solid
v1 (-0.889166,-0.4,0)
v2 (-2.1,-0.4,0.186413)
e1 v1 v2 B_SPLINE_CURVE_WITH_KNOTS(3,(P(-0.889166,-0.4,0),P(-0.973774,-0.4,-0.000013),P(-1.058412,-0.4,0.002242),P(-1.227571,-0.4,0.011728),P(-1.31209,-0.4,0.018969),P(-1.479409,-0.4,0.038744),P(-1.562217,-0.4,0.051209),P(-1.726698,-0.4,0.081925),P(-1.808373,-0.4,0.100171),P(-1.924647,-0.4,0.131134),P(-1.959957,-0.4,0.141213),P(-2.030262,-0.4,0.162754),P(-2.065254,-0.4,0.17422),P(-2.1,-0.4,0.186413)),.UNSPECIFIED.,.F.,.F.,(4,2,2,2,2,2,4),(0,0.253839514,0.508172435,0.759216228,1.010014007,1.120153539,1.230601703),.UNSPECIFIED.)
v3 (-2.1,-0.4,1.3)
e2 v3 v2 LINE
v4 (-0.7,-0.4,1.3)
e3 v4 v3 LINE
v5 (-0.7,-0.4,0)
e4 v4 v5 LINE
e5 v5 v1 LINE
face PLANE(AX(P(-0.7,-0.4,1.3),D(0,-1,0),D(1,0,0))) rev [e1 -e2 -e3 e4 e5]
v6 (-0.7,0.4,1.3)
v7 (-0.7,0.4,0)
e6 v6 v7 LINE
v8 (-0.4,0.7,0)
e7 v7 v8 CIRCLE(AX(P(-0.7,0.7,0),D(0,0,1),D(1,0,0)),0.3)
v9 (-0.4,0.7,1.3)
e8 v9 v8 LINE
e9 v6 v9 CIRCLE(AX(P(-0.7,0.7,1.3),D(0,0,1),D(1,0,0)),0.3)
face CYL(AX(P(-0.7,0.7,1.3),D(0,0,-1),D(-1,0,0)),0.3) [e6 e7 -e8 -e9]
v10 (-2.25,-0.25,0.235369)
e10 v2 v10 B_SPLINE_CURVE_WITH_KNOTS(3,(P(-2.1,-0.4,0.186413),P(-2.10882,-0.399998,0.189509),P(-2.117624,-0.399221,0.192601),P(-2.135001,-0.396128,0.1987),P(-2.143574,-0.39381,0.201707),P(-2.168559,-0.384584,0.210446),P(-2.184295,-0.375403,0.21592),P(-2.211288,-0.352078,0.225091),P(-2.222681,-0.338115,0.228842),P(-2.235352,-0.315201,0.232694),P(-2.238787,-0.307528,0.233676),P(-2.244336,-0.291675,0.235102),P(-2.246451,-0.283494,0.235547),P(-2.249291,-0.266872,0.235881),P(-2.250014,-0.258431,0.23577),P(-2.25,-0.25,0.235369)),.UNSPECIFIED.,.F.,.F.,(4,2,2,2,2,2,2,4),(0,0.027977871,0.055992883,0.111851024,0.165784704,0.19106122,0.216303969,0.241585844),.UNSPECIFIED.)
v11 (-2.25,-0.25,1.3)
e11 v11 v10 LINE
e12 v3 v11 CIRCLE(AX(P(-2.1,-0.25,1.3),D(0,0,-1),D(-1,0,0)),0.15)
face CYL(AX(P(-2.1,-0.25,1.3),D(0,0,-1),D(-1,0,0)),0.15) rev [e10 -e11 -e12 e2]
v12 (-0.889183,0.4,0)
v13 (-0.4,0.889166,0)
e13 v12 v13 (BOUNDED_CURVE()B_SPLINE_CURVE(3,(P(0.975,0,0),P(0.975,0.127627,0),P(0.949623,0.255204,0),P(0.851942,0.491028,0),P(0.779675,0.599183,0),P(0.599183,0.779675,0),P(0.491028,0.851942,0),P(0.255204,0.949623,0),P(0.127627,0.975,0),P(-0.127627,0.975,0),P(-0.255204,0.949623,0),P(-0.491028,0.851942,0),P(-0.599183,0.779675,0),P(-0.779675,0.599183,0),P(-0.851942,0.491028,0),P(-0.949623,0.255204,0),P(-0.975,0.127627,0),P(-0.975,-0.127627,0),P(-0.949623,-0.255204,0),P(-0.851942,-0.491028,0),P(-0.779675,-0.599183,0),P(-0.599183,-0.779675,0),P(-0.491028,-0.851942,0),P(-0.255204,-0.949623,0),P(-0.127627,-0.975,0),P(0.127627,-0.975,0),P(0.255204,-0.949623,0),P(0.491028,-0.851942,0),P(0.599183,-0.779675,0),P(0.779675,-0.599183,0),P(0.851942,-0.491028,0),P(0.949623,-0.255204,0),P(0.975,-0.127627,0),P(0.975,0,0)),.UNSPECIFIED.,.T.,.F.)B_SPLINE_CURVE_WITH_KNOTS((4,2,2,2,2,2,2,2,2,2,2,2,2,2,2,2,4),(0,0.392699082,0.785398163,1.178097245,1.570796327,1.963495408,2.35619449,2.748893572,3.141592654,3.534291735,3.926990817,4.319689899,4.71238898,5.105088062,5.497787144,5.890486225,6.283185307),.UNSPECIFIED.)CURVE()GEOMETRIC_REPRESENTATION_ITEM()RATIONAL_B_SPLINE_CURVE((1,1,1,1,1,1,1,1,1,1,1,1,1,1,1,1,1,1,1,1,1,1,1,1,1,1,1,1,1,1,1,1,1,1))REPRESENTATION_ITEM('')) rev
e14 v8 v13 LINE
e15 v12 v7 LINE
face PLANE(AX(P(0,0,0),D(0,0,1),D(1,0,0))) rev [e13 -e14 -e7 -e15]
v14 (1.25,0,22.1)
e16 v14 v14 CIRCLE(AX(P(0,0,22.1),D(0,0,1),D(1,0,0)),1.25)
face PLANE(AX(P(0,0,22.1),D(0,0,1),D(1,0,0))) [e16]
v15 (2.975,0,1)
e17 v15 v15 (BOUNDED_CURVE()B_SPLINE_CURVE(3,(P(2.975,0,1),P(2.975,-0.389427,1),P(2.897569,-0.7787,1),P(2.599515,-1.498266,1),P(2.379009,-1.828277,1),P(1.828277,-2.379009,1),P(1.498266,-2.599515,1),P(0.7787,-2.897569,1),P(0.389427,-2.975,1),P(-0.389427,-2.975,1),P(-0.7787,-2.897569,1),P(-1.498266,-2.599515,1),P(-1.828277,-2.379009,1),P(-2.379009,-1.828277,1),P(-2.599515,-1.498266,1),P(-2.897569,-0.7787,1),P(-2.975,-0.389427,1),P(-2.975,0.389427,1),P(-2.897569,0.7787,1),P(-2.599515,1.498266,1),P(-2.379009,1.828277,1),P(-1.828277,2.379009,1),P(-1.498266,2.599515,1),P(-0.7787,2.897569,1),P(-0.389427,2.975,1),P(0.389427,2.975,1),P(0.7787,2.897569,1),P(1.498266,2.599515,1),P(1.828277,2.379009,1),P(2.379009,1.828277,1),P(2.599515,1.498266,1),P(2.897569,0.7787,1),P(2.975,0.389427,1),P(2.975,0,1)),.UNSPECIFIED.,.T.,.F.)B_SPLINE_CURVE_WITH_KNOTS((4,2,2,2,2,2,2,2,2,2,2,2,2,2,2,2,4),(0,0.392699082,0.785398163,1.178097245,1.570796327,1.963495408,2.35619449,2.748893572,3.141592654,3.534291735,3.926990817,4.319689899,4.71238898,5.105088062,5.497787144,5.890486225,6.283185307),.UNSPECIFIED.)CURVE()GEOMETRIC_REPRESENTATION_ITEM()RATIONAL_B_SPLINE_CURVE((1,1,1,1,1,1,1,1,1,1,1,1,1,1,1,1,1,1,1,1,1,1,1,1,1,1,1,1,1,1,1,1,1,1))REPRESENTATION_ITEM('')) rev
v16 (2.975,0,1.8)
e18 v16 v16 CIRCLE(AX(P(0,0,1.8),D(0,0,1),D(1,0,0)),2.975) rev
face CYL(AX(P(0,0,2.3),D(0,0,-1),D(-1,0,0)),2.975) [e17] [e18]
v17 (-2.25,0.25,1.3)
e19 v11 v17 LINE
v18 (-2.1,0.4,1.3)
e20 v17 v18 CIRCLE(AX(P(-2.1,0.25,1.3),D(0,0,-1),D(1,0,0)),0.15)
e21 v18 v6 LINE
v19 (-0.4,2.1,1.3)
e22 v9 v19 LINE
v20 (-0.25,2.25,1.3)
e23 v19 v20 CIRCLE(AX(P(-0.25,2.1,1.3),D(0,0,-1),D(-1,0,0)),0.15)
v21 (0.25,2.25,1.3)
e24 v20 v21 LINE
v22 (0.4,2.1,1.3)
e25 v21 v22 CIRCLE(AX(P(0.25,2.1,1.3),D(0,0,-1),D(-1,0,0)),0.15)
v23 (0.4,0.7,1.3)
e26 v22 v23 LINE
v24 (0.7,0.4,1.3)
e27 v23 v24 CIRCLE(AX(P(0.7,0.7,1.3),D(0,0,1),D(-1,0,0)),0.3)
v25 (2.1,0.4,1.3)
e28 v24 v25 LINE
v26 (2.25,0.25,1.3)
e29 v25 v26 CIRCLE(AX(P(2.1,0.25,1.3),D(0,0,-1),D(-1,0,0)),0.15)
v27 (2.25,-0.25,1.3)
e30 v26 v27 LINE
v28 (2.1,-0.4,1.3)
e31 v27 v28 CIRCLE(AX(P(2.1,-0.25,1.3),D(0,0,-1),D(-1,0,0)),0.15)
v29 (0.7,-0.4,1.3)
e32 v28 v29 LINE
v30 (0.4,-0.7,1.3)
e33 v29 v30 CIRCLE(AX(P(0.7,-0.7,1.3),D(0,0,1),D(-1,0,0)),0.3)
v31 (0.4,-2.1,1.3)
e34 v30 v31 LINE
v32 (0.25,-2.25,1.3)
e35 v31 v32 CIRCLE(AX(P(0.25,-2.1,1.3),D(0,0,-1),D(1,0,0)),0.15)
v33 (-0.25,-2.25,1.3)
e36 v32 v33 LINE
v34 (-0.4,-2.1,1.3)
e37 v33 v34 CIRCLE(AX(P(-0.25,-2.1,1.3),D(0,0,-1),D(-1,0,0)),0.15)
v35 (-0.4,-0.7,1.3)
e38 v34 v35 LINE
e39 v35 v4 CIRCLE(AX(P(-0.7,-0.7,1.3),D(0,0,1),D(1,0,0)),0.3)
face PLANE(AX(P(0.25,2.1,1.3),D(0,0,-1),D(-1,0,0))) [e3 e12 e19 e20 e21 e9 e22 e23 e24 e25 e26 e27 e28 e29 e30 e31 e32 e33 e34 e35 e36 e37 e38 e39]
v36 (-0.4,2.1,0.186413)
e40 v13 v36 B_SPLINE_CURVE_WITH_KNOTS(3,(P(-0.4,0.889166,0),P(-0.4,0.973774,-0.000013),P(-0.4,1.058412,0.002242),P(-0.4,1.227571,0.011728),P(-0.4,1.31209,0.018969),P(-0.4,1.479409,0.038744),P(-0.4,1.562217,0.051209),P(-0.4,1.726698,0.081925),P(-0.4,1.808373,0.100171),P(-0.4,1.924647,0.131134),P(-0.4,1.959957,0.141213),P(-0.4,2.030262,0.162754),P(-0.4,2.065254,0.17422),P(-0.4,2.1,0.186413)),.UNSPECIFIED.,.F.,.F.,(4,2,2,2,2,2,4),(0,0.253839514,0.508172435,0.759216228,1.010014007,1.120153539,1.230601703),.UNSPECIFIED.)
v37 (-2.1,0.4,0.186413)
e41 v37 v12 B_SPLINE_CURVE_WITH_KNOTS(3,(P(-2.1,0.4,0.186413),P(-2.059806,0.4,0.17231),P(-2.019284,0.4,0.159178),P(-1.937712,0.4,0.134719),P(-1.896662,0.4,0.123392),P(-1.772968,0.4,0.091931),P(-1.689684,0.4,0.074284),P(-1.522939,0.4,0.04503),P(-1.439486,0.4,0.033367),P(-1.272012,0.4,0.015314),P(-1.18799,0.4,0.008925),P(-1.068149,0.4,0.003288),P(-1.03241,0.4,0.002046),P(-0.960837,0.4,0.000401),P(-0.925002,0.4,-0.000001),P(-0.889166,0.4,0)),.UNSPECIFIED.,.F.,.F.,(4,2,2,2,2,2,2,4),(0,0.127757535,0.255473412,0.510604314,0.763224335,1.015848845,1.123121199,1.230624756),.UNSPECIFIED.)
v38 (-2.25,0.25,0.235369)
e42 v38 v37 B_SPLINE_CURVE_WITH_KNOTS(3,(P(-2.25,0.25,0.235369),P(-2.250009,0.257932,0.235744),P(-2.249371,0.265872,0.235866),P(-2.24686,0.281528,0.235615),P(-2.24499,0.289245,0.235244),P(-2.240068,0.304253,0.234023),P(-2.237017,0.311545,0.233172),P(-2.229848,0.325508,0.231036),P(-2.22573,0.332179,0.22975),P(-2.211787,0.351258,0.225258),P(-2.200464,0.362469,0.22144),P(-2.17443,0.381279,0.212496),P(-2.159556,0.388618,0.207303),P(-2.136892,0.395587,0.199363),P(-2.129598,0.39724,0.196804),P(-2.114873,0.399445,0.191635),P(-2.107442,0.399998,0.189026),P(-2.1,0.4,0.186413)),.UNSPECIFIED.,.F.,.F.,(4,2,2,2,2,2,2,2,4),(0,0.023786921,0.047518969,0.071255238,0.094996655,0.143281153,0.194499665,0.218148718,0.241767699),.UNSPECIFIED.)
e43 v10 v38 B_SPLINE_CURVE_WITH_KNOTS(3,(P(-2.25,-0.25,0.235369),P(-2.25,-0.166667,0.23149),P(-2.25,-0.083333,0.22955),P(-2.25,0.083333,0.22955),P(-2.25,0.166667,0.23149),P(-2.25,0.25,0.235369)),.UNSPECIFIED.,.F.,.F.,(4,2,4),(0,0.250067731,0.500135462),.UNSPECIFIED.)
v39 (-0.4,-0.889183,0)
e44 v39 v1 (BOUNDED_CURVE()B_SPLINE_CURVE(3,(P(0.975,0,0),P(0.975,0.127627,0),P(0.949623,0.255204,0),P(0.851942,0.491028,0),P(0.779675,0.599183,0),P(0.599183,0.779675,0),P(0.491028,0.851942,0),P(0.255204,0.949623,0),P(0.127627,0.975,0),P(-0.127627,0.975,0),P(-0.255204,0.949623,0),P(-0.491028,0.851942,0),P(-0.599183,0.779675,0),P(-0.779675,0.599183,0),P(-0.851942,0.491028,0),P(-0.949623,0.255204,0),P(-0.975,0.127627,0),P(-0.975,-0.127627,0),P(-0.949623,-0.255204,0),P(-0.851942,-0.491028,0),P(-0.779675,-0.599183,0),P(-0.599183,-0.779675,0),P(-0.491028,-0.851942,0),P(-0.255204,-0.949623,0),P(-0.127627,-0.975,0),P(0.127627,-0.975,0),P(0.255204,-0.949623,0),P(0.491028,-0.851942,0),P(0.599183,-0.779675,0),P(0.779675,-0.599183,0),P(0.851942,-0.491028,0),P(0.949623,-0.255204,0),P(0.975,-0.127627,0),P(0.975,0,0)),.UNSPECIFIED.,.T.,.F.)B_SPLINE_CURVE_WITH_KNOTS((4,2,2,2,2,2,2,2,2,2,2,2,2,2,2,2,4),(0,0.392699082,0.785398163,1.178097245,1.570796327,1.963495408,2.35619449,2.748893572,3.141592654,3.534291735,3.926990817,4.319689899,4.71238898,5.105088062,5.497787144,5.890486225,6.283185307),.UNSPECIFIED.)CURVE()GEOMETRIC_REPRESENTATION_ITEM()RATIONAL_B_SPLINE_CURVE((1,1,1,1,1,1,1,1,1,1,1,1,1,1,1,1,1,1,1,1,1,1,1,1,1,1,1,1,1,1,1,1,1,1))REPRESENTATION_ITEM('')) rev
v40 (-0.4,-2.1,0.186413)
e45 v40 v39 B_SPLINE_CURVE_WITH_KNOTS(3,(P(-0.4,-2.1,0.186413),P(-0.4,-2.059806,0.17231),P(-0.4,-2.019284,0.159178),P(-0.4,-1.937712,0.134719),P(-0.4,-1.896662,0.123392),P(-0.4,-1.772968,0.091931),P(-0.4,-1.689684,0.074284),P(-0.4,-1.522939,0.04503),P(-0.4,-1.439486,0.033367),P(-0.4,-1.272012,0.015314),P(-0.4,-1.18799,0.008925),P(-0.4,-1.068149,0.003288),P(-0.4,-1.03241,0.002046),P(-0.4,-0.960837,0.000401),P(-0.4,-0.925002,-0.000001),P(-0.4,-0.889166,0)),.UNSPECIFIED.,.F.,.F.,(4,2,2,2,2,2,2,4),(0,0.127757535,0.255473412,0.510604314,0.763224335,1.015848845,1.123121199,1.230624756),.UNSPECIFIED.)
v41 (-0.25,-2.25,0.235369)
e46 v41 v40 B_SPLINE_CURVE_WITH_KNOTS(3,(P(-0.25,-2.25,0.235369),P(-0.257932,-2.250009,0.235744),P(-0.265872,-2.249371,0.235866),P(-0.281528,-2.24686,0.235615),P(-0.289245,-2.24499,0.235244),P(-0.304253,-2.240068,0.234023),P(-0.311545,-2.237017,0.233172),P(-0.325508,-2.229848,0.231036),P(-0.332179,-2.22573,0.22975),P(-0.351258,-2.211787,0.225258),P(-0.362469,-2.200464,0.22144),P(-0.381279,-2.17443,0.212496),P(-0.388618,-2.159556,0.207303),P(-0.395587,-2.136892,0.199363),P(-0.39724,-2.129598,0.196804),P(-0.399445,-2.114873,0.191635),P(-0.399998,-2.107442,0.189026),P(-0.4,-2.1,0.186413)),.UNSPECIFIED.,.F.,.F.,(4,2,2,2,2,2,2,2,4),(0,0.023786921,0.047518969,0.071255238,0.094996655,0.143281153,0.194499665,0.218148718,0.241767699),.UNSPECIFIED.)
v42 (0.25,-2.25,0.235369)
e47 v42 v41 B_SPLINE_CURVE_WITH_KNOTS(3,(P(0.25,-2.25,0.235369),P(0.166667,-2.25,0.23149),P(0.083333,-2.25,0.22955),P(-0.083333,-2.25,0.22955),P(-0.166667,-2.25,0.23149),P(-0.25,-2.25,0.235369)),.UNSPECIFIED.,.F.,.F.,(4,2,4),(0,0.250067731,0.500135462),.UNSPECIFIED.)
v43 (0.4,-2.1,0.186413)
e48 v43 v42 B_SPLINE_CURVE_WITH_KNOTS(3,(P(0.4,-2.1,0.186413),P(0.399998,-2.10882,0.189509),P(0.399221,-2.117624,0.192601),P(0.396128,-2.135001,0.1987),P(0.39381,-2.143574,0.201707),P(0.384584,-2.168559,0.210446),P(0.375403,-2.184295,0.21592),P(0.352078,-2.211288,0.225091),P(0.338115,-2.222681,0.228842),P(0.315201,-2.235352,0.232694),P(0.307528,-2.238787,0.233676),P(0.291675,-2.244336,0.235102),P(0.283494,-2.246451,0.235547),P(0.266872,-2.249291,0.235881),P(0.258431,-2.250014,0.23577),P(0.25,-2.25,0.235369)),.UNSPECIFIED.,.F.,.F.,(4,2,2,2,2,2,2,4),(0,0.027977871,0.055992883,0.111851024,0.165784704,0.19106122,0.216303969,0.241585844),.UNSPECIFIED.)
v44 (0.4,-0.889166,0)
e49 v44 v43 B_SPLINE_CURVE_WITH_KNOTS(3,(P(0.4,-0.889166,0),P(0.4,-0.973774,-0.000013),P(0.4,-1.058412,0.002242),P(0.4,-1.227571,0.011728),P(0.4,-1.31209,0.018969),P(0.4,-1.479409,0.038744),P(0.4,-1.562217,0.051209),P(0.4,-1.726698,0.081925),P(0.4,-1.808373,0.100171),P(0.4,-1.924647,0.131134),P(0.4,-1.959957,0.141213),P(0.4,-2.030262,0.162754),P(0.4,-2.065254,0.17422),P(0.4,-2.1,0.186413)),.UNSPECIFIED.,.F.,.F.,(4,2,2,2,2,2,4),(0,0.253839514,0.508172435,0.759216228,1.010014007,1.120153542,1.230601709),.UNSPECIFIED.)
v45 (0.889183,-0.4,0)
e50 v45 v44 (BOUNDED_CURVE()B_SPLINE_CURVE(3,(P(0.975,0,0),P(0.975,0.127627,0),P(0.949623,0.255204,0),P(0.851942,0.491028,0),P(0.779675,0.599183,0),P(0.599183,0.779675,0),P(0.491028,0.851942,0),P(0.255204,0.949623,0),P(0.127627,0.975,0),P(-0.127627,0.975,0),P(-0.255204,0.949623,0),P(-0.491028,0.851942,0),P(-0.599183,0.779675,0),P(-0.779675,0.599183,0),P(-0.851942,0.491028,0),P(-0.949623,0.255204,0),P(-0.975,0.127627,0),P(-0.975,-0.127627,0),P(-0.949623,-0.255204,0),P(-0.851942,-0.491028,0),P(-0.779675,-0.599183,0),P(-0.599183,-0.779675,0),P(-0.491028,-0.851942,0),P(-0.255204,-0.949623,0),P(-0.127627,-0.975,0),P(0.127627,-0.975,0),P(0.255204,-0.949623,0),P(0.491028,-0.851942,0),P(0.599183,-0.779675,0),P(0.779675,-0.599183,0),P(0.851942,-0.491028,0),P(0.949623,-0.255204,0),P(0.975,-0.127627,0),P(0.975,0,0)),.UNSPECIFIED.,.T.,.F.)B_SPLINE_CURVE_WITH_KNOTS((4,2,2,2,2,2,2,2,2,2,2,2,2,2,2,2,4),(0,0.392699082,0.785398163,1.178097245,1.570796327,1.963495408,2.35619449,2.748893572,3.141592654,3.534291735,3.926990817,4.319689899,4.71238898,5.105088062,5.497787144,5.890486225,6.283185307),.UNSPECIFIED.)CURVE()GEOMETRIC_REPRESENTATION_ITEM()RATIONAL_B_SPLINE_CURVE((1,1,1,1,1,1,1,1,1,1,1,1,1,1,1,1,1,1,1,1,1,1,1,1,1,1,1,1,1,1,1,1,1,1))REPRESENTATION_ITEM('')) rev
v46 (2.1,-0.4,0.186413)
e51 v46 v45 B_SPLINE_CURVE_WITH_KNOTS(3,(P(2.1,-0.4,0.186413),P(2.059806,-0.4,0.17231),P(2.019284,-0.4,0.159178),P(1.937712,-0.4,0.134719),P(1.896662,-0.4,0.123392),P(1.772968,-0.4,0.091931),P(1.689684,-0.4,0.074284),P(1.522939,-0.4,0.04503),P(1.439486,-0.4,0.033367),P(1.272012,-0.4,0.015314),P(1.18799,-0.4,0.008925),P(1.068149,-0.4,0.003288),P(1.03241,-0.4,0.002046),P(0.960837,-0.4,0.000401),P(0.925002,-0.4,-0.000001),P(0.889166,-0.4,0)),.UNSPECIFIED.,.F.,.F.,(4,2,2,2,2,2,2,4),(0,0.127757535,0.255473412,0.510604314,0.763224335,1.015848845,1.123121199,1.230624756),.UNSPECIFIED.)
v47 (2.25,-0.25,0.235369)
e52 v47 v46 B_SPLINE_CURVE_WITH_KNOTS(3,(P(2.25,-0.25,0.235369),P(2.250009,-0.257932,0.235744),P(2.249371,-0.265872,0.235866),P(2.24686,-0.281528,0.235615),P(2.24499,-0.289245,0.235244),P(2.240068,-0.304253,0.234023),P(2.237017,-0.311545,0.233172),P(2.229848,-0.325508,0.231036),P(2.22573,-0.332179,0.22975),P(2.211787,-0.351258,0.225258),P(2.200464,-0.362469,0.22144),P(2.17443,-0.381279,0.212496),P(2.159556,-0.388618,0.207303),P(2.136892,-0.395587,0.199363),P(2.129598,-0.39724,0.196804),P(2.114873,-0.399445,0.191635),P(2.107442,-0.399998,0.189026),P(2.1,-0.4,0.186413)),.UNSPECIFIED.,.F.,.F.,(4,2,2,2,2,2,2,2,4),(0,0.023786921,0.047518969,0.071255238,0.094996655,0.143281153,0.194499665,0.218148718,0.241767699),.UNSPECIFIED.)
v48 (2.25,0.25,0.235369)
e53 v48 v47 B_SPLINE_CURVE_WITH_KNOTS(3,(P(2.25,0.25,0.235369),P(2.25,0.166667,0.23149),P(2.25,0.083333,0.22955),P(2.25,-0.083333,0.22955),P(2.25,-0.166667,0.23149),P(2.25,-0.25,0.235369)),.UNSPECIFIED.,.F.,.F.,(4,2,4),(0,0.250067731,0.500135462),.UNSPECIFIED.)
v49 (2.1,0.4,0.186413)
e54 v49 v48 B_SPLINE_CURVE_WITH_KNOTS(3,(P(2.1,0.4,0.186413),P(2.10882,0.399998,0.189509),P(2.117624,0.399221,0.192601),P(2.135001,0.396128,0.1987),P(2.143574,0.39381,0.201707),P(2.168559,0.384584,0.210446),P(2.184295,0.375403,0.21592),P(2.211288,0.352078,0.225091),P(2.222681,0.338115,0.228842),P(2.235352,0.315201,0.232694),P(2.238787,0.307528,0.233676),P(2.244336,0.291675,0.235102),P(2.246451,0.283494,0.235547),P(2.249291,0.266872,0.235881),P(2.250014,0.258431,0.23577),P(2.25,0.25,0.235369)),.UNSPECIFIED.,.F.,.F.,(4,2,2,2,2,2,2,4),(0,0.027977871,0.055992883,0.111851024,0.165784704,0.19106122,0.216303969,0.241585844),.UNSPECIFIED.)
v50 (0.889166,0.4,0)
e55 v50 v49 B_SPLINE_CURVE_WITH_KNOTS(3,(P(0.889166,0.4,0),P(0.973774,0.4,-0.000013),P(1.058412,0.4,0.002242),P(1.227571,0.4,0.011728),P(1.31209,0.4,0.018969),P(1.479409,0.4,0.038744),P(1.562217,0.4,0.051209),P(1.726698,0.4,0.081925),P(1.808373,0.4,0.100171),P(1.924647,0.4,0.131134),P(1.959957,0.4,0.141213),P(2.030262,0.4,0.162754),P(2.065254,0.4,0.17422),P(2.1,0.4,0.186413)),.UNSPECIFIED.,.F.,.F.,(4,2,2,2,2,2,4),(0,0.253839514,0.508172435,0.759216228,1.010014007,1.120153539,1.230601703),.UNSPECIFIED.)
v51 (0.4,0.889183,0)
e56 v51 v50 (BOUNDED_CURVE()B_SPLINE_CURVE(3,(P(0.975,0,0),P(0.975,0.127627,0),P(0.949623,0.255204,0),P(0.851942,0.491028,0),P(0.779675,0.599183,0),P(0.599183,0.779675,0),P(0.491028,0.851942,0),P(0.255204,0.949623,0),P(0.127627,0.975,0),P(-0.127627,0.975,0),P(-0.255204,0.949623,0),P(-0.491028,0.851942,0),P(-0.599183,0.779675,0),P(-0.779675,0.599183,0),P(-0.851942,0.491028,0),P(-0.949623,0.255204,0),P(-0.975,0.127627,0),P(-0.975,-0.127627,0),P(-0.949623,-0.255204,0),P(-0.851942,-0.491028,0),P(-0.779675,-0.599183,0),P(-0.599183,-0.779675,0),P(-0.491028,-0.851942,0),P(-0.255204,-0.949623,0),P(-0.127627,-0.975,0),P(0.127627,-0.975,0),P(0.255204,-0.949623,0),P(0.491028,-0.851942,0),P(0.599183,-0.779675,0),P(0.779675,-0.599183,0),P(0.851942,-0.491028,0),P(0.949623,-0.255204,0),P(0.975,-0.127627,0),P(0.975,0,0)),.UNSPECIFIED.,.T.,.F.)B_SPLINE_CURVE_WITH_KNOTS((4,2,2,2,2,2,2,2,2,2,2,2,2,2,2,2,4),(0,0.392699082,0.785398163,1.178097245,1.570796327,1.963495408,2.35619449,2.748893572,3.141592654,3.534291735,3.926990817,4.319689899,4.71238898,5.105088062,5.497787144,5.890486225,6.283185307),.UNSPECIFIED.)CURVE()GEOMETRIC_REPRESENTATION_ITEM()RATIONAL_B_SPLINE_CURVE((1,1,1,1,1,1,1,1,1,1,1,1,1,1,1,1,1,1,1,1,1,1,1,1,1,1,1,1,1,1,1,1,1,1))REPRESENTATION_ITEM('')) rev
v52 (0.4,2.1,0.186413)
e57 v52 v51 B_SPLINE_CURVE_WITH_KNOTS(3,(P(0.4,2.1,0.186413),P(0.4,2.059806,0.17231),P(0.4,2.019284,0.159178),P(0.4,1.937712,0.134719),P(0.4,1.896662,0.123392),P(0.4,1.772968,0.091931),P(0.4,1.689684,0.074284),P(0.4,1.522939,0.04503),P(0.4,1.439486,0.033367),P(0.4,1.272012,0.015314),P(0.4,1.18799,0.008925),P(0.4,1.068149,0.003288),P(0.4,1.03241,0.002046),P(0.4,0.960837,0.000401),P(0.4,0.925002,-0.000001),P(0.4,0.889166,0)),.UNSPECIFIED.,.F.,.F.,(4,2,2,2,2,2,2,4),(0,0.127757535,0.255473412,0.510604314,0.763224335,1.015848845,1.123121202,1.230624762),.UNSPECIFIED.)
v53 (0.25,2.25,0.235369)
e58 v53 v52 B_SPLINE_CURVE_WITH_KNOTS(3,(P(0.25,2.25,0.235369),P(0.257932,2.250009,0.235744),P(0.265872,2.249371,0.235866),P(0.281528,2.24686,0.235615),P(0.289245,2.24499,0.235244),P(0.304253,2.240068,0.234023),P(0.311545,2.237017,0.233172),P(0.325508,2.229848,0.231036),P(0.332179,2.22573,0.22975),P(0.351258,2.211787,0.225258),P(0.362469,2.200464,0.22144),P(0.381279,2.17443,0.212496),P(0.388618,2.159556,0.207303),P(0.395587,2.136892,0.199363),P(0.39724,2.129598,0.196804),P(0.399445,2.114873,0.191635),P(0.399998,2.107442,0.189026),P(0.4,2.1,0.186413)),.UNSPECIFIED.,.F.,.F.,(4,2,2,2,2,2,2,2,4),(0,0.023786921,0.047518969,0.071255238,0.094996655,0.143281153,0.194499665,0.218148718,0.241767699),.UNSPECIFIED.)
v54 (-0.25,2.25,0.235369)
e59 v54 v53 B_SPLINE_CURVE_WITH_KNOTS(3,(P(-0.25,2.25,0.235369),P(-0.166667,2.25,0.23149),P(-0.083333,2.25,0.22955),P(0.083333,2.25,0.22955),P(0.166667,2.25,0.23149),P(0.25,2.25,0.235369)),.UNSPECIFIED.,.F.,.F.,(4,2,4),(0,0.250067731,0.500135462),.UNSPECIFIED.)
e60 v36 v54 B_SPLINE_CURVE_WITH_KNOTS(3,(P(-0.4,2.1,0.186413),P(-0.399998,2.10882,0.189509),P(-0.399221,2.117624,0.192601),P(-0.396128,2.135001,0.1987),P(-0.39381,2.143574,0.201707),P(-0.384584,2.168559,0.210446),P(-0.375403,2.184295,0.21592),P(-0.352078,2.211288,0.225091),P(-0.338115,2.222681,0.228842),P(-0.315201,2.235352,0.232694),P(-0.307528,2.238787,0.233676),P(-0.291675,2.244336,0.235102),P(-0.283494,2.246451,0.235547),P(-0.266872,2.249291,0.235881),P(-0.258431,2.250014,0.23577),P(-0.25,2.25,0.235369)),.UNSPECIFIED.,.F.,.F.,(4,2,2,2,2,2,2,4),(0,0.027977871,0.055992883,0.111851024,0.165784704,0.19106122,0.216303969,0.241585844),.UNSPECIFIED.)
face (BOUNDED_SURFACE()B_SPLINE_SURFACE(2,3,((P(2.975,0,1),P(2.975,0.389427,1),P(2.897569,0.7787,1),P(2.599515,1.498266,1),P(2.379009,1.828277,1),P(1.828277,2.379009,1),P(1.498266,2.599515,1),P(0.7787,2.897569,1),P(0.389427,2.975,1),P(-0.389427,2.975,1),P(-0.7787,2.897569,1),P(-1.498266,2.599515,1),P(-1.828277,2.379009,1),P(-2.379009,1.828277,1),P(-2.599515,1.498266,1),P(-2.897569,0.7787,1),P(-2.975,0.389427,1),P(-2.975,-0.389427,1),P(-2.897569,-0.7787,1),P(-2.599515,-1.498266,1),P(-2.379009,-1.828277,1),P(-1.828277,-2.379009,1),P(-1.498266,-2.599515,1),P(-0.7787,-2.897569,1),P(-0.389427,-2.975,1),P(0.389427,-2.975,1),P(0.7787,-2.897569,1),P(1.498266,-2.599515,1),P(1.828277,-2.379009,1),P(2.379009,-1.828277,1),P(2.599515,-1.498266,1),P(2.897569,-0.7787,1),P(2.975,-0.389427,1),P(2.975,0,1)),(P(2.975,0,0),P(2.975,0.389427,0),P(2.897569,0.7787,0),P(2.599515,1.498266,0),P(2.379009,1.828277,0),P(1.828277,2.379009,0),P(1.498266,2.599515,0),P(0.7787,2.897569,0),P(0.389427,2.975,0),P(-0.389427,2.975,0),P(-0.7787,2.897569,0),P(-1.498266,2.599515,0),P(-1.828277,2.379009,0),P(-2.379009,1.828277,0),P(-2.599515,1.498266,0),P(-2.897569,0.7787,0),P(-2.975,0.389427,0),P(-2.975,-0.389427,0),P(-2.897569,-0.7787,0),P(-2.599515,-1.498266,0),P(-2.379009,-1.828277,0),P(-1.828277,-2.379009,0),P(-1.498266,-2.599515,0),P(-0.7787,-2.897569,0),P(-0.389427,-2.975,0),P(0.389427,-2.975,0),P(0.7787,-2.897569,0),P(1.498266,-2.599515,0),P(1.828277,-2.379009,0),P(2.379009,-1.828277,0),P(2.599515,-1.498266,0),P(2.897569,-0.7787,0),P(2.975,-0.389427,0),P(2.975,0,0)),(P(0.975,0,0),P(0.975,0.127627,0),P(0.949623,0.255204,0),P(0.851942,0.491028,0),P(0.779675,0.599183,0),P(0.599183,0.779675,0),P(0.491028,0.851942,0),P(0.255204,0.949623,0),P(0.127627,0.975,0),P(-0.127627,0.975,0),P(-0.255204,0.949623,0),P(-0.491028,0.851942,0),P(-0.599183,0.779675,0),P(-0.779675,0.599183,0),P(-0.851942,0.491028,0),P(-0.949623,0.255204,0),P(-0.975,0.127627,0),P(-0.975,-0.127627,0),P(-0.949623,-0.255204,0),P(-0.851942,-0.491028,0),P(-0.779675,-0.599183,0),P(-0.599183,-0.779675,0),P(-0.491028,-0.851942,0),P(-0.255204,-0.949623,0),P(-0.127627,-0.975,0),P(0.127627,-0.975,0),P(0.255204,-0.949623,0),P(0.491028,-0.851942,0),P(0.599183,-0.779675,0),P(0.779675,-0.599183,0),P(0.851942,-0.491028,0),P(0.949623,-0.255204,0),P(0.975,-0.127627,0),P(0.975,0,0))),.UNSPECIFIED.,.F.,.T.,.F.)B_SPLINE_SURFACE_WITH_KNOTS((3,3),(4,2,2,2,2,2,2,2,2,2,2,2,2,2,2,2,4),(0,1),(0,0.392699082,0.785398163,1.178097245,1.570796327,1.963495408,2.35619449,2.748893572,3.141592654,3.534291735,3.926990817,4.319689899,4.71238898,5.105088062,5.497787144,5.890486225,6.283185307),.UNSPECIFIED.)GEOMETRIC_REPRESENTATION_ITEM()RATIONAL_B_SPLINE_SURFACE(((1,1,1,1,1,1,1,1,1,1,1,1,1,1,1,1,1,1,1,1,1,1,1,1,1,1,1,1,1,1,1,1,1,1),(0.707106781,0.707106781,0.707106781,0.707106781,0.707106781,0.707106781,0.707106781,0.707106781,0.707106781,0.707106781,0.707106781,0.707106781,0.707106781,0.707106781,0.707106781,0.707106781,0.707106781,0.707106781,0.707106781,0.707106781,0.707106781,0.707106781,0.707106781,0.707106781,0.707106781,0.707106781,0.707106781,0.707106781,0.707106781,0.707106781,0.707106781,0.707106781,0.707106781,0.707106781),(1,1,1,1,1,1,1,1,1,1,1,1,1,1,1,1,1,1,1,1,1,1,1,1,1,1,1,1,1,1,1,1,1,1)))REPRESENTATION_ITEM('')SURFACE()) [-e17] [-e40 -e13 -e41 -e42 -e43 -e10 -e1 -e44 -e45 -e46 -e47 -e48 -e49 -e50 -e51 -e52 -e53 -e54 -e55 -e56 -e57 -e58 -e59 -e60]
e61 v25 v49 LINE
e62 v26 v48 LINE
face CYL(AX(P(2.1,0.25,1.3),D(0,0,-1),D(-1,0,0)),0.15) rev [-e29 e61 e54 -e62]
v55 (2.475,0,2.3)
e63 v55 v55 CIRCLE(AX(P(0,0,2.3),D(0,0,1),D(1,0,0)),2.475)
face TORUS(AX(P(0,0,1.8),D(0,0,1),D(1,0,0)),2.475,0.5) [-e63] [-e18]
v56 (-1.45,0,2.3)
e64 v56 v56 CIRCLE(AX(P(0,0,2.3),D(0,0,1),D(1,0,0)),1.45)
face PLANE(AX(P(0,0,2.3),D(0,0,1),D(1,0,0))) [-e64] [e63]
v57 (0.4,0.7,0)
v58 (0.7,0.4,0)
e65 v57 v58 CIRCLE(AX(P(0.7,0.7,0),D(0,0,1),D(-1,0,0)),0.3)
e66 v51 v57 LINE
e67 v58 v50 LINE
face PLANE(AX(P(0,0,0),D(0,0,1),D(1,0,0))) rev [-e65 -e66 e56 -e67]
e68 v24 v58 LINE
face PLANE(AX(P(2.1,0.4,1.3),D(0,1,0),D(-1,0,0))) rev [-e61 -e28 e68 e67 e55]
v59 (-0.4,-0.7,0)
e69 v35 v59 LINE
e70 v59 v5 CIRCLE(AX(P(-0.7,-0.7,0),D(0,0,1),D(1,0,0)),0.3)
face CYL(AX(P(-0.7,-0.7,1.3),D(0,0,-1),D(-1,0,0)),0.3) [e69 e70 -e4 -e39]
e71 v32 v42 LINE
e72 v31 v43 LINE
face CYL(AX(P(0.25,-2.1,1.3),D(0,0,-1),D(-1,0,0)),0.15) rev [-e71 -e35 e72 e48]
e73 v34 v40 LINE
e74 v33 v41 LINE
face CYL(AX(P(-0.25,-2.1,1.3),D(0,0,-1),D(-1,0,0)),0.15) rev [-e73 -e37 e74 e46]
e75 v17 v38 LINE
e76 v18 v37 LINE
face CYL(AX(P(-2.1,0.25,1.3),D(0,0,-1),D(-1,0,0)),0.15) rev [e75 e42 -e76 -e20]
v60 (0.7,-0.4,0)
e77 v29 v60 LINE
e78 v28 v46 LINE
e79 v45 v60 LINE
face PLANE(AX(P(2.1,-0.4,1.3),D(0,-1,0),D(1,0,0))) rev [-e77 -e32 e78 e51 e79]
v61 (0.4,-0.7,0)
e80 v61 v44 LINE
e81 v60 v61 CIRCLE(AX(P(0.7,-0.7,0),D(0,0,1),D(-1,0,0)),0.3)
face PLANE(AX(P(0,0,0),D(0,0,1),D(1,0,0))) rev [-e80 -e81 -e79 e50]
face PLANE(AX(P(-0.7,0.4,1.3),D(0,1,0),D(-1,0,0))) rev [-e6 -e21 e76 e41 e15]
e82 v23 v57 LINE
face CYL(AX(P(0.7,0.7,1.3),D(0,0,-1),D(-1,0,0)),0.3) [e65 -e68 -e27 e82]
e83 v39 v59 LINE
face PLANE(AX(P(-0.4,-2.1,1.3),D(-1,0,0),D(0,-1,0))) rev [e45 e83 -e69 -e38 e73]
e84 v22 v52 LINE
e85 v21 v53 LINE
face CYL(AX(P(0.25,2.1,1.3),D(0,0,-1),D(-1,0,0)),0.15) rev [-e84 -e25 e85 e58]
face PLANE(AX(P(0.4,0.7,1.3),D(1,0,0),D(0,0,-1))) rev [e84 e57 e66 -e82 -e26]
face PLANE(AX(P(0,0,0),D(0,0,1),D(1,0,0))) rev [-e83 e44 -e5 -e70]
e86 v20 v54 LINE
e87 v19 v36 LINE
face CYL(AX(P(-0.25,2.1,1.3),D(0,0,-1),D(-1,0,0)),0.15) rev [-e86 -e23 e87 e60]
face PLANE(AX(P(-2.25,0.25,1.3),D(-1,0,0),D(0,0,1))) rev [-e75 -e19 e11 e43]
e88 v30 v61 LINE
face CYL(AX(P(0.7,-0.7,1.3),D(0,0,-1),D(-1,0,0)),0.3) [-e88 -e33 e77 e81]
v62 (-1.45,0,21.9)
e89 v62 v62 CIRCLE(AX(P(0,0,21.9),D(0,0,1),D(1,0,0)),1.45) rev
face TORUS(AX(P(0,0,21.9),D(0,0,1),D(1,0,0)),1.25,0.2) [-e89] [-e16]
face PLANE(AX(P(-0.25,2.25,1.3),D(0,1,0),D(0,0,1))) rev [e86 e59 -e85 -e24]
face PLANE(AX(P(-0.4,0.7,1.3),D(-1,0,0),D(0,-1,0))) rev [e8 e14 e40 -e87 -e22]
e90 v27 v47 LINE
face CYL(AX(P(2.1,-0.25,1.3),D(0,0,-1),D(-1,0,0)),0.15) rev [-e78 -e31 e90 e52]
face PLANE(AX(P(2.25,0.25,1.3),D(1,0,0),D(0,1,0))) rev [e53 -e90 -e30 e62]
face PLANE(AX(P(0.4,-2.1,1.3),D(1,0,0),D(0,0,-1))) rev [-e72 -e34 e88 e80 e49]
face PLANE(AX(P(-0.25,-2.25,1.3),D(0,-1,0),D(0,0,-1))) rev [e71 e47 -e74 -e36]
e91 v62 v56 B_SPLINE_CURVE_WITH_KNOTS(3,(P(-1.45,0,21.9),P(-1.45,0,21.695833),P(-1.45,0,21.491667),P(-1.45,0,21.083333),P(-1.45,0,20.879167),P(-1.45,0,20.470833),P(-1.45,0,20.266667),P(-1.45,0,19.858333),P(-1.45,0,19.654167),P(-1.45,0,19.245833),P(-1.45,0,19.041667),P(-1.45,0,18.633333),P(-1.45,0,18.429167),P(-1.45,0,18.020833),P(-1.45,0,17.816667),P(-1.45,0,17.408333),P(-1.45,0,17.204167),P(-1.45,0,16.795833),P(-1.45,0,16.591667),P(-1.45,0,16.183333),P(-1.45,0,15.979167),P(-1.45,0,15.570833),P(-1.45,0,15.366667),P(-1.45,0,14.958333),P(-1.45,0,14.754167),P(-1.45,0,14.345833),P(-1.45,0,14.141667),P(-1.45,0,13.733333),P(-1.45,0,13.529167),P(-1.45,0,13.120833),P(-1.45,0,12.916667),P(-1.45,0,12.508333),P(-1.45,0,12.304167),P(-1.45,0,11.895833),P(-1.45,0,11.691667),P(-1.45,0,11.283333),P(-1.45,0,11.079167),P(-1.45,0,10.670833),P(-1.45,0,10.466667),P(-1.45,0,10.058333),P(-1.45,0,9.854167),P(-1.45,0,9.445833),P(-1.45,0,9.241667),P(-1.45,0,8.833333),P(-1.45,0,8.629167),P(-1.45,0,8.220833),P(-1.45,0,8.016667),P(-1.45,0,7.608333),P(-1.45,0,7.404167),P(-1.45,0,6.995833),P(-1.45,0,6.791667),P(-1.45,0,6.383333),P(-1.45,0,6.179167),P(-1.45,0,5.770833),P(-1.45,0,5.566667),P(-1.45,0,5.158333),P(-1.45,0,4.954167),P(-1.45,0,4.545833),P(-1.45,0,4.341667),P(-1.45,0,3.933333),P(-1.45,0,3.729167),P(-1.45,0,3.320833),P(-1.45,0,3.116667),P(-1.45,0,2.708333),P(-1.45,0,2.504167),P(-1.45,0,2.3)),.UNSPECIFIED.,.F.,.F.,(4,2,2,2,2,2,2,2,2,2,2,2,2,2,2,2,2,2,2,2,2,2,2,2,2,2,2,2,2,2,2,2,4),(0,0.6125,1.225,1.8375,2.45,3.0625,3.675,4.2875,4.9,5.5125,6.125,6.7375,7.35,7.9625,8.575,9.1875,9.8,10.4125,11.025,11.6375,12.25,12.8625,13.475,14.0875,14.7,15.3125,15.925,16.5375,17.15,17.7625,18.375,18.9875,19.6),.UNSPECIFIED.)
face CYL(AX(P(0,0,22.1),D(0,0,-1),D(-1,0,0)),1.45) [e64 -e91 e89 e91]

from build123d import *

# Parameters (mm, degrees)
ESBO_O1_R                = 2.975
RESSALTO_EXTRUS_O1_DEPTH = 2.3
FILETE1_SIZE             = 1
FILETE1_SIZE_2           = 2
FILETE2_R                = 0.5
CORTE_EXTRUS_O1_DEPTH    = 1.3
ESBO_O3_R                = 1.45
RESSALTO_EXTRUS_O2_DEPTH = 19.8
FILETE3_R                = 0.2


with BuildPart() as part:
    # Esboço1 → Ressalto-extrusão1 (new body)
    with BuildSketch(Plane.XY):
        Circle(ESBO_O1_R)
    extrude(amount=RESSALTO_EXTRUS_O1_DEPTH)

    # Filete1
    # an asymmetric fillet: 2, 1 mm, written as the material it takes off along each edge
    with BuildSketch(Plane(origin=(0, 0, 0), x_dir=(1, 0, 0), z_dir=(0, -1, 0))) as filete1_piece_1:
        with BuildLine():
            Bezier((2.975, FILETE1_SIZE), (2.975, 0), (2.975 - FILETE1_SIZE_2, 0), weights=[1, 0.707106781, 1])
            Line((2.975 - FILETE1_SIZE_2, 0), (2.975, 0))
            Line((2.975, 0), (2.975, FILETE1_SIZE))
        make_face()
    revolve(axis=Axis((0, 0, 0), (0, 0, 1)), mode=Mode.SUBTRACT)

    # Filete2
    filete2_edges = [part.edges().sort_by_distance(p)[0] for p in [
        (-2.975, 0, 2.3),
    ]]
    fillet(filete2_edges, radius=FILETE2_R)

    # Esboço2 → Corte-extrusão1 (cut)
    with BuildSketch(Plane(origin=(0, 0, 0), x_dir=(-1, 0, 0), z_dir=(0, 0, -1))):
        with BuildLine():
            Line((0.25, -2.25), (-0.25, -2.25))
            ThreePointArc((-0.25, -2.25), (-0.356066017, -2.206066017), (-0.4, -2.1))
            Line((-0.4, -2.1), (-0.4, -0.7))
            ThreePointArc((-0.4, -0.7), (-0.487867966, -0.487867966), (-0.7, -0.4))
            Line((-0.7, -0.4), (-2.1, -0.4))
            ThreePointArc((-2.1, -0.4), (-2.206066017, -0.356066017), (-2.25, -0.25))
            Line((-2.25, -0.25), (-2.25, 0.25))
            ThreePointArc((-2.25, 0.25), (-2.206066017, 0.356066017), (-2.1, 0.4))
            Line((-2.1, 0.4), (-0.7, 0.4))
            ThreePointArc((-0.7, 0.4), (-0.487867966, 0.487867966), (-0.4, 0.7))
            Line((-0.4, 0.7), (-0.4, 2.1))
            ThreePointArc((-0.4, 2.1), (-0.356066017, 2.206066017), (-0.25, 2.25))
            Line((-0.25, 2.25), (0.25, 2.25))
            ThreePointArc((0.25, 2.25), (0.356066017, 2.206066017), (0.4, 2.1))
            Line((0.4, 2.1), (0.4, 0.7))
            ThreePointArc((0.4, 0.7), (0.487867966, 0.487867966), (0.7, 0.4))
            Line((0.7, 0.4), (2.1, 0.4))
            ThreePointArc((2.1, 0.4), (2.206066017, 0.356066017), (2.25, 0.25))
            Line((2.25, 0.25), (2.25, -0.25))
            ThreePointArc((2.25, -0.25), (2.206066017, -0.356066017), (2.1, -0.4))
            Line((2.1, -0.4), (0.7, -0.4))
            ThreePointArc((0.7, -0.4), (0.487867966, -0.487867966), (0.4, -0.7))
            Line((0.4, -0.7), (0.4, -2.1))
            ThreePointArc((0.4, -2.1), (0.356066017, -2.206066017), (0.25, -2.25))
        make_face()
    extrude(amount=-CORTE_EXTRUS_O1_DEPTH, mode=Mode.SUBTRACT)

    # Esboço3 → Ressalto-extrusão2 (add)
    with BuildSketch(Plane.XY.offset(2.3)):
        with Locations(Location((0, 0, 0), (0, 0, 180))):
            Circle(ESBO_O3_R)
    extrude(amount=RESSALTO_EXTRUS_O2_DEPTH)

    # Filete3
    filete3_edges = [part.edges().sort_by_distance(p)[0] for p in [
        (1.45, 0, 22.1),
    ]]
    fillet(filete3_edges, radius=FILETE3_R)


solid = part.part
